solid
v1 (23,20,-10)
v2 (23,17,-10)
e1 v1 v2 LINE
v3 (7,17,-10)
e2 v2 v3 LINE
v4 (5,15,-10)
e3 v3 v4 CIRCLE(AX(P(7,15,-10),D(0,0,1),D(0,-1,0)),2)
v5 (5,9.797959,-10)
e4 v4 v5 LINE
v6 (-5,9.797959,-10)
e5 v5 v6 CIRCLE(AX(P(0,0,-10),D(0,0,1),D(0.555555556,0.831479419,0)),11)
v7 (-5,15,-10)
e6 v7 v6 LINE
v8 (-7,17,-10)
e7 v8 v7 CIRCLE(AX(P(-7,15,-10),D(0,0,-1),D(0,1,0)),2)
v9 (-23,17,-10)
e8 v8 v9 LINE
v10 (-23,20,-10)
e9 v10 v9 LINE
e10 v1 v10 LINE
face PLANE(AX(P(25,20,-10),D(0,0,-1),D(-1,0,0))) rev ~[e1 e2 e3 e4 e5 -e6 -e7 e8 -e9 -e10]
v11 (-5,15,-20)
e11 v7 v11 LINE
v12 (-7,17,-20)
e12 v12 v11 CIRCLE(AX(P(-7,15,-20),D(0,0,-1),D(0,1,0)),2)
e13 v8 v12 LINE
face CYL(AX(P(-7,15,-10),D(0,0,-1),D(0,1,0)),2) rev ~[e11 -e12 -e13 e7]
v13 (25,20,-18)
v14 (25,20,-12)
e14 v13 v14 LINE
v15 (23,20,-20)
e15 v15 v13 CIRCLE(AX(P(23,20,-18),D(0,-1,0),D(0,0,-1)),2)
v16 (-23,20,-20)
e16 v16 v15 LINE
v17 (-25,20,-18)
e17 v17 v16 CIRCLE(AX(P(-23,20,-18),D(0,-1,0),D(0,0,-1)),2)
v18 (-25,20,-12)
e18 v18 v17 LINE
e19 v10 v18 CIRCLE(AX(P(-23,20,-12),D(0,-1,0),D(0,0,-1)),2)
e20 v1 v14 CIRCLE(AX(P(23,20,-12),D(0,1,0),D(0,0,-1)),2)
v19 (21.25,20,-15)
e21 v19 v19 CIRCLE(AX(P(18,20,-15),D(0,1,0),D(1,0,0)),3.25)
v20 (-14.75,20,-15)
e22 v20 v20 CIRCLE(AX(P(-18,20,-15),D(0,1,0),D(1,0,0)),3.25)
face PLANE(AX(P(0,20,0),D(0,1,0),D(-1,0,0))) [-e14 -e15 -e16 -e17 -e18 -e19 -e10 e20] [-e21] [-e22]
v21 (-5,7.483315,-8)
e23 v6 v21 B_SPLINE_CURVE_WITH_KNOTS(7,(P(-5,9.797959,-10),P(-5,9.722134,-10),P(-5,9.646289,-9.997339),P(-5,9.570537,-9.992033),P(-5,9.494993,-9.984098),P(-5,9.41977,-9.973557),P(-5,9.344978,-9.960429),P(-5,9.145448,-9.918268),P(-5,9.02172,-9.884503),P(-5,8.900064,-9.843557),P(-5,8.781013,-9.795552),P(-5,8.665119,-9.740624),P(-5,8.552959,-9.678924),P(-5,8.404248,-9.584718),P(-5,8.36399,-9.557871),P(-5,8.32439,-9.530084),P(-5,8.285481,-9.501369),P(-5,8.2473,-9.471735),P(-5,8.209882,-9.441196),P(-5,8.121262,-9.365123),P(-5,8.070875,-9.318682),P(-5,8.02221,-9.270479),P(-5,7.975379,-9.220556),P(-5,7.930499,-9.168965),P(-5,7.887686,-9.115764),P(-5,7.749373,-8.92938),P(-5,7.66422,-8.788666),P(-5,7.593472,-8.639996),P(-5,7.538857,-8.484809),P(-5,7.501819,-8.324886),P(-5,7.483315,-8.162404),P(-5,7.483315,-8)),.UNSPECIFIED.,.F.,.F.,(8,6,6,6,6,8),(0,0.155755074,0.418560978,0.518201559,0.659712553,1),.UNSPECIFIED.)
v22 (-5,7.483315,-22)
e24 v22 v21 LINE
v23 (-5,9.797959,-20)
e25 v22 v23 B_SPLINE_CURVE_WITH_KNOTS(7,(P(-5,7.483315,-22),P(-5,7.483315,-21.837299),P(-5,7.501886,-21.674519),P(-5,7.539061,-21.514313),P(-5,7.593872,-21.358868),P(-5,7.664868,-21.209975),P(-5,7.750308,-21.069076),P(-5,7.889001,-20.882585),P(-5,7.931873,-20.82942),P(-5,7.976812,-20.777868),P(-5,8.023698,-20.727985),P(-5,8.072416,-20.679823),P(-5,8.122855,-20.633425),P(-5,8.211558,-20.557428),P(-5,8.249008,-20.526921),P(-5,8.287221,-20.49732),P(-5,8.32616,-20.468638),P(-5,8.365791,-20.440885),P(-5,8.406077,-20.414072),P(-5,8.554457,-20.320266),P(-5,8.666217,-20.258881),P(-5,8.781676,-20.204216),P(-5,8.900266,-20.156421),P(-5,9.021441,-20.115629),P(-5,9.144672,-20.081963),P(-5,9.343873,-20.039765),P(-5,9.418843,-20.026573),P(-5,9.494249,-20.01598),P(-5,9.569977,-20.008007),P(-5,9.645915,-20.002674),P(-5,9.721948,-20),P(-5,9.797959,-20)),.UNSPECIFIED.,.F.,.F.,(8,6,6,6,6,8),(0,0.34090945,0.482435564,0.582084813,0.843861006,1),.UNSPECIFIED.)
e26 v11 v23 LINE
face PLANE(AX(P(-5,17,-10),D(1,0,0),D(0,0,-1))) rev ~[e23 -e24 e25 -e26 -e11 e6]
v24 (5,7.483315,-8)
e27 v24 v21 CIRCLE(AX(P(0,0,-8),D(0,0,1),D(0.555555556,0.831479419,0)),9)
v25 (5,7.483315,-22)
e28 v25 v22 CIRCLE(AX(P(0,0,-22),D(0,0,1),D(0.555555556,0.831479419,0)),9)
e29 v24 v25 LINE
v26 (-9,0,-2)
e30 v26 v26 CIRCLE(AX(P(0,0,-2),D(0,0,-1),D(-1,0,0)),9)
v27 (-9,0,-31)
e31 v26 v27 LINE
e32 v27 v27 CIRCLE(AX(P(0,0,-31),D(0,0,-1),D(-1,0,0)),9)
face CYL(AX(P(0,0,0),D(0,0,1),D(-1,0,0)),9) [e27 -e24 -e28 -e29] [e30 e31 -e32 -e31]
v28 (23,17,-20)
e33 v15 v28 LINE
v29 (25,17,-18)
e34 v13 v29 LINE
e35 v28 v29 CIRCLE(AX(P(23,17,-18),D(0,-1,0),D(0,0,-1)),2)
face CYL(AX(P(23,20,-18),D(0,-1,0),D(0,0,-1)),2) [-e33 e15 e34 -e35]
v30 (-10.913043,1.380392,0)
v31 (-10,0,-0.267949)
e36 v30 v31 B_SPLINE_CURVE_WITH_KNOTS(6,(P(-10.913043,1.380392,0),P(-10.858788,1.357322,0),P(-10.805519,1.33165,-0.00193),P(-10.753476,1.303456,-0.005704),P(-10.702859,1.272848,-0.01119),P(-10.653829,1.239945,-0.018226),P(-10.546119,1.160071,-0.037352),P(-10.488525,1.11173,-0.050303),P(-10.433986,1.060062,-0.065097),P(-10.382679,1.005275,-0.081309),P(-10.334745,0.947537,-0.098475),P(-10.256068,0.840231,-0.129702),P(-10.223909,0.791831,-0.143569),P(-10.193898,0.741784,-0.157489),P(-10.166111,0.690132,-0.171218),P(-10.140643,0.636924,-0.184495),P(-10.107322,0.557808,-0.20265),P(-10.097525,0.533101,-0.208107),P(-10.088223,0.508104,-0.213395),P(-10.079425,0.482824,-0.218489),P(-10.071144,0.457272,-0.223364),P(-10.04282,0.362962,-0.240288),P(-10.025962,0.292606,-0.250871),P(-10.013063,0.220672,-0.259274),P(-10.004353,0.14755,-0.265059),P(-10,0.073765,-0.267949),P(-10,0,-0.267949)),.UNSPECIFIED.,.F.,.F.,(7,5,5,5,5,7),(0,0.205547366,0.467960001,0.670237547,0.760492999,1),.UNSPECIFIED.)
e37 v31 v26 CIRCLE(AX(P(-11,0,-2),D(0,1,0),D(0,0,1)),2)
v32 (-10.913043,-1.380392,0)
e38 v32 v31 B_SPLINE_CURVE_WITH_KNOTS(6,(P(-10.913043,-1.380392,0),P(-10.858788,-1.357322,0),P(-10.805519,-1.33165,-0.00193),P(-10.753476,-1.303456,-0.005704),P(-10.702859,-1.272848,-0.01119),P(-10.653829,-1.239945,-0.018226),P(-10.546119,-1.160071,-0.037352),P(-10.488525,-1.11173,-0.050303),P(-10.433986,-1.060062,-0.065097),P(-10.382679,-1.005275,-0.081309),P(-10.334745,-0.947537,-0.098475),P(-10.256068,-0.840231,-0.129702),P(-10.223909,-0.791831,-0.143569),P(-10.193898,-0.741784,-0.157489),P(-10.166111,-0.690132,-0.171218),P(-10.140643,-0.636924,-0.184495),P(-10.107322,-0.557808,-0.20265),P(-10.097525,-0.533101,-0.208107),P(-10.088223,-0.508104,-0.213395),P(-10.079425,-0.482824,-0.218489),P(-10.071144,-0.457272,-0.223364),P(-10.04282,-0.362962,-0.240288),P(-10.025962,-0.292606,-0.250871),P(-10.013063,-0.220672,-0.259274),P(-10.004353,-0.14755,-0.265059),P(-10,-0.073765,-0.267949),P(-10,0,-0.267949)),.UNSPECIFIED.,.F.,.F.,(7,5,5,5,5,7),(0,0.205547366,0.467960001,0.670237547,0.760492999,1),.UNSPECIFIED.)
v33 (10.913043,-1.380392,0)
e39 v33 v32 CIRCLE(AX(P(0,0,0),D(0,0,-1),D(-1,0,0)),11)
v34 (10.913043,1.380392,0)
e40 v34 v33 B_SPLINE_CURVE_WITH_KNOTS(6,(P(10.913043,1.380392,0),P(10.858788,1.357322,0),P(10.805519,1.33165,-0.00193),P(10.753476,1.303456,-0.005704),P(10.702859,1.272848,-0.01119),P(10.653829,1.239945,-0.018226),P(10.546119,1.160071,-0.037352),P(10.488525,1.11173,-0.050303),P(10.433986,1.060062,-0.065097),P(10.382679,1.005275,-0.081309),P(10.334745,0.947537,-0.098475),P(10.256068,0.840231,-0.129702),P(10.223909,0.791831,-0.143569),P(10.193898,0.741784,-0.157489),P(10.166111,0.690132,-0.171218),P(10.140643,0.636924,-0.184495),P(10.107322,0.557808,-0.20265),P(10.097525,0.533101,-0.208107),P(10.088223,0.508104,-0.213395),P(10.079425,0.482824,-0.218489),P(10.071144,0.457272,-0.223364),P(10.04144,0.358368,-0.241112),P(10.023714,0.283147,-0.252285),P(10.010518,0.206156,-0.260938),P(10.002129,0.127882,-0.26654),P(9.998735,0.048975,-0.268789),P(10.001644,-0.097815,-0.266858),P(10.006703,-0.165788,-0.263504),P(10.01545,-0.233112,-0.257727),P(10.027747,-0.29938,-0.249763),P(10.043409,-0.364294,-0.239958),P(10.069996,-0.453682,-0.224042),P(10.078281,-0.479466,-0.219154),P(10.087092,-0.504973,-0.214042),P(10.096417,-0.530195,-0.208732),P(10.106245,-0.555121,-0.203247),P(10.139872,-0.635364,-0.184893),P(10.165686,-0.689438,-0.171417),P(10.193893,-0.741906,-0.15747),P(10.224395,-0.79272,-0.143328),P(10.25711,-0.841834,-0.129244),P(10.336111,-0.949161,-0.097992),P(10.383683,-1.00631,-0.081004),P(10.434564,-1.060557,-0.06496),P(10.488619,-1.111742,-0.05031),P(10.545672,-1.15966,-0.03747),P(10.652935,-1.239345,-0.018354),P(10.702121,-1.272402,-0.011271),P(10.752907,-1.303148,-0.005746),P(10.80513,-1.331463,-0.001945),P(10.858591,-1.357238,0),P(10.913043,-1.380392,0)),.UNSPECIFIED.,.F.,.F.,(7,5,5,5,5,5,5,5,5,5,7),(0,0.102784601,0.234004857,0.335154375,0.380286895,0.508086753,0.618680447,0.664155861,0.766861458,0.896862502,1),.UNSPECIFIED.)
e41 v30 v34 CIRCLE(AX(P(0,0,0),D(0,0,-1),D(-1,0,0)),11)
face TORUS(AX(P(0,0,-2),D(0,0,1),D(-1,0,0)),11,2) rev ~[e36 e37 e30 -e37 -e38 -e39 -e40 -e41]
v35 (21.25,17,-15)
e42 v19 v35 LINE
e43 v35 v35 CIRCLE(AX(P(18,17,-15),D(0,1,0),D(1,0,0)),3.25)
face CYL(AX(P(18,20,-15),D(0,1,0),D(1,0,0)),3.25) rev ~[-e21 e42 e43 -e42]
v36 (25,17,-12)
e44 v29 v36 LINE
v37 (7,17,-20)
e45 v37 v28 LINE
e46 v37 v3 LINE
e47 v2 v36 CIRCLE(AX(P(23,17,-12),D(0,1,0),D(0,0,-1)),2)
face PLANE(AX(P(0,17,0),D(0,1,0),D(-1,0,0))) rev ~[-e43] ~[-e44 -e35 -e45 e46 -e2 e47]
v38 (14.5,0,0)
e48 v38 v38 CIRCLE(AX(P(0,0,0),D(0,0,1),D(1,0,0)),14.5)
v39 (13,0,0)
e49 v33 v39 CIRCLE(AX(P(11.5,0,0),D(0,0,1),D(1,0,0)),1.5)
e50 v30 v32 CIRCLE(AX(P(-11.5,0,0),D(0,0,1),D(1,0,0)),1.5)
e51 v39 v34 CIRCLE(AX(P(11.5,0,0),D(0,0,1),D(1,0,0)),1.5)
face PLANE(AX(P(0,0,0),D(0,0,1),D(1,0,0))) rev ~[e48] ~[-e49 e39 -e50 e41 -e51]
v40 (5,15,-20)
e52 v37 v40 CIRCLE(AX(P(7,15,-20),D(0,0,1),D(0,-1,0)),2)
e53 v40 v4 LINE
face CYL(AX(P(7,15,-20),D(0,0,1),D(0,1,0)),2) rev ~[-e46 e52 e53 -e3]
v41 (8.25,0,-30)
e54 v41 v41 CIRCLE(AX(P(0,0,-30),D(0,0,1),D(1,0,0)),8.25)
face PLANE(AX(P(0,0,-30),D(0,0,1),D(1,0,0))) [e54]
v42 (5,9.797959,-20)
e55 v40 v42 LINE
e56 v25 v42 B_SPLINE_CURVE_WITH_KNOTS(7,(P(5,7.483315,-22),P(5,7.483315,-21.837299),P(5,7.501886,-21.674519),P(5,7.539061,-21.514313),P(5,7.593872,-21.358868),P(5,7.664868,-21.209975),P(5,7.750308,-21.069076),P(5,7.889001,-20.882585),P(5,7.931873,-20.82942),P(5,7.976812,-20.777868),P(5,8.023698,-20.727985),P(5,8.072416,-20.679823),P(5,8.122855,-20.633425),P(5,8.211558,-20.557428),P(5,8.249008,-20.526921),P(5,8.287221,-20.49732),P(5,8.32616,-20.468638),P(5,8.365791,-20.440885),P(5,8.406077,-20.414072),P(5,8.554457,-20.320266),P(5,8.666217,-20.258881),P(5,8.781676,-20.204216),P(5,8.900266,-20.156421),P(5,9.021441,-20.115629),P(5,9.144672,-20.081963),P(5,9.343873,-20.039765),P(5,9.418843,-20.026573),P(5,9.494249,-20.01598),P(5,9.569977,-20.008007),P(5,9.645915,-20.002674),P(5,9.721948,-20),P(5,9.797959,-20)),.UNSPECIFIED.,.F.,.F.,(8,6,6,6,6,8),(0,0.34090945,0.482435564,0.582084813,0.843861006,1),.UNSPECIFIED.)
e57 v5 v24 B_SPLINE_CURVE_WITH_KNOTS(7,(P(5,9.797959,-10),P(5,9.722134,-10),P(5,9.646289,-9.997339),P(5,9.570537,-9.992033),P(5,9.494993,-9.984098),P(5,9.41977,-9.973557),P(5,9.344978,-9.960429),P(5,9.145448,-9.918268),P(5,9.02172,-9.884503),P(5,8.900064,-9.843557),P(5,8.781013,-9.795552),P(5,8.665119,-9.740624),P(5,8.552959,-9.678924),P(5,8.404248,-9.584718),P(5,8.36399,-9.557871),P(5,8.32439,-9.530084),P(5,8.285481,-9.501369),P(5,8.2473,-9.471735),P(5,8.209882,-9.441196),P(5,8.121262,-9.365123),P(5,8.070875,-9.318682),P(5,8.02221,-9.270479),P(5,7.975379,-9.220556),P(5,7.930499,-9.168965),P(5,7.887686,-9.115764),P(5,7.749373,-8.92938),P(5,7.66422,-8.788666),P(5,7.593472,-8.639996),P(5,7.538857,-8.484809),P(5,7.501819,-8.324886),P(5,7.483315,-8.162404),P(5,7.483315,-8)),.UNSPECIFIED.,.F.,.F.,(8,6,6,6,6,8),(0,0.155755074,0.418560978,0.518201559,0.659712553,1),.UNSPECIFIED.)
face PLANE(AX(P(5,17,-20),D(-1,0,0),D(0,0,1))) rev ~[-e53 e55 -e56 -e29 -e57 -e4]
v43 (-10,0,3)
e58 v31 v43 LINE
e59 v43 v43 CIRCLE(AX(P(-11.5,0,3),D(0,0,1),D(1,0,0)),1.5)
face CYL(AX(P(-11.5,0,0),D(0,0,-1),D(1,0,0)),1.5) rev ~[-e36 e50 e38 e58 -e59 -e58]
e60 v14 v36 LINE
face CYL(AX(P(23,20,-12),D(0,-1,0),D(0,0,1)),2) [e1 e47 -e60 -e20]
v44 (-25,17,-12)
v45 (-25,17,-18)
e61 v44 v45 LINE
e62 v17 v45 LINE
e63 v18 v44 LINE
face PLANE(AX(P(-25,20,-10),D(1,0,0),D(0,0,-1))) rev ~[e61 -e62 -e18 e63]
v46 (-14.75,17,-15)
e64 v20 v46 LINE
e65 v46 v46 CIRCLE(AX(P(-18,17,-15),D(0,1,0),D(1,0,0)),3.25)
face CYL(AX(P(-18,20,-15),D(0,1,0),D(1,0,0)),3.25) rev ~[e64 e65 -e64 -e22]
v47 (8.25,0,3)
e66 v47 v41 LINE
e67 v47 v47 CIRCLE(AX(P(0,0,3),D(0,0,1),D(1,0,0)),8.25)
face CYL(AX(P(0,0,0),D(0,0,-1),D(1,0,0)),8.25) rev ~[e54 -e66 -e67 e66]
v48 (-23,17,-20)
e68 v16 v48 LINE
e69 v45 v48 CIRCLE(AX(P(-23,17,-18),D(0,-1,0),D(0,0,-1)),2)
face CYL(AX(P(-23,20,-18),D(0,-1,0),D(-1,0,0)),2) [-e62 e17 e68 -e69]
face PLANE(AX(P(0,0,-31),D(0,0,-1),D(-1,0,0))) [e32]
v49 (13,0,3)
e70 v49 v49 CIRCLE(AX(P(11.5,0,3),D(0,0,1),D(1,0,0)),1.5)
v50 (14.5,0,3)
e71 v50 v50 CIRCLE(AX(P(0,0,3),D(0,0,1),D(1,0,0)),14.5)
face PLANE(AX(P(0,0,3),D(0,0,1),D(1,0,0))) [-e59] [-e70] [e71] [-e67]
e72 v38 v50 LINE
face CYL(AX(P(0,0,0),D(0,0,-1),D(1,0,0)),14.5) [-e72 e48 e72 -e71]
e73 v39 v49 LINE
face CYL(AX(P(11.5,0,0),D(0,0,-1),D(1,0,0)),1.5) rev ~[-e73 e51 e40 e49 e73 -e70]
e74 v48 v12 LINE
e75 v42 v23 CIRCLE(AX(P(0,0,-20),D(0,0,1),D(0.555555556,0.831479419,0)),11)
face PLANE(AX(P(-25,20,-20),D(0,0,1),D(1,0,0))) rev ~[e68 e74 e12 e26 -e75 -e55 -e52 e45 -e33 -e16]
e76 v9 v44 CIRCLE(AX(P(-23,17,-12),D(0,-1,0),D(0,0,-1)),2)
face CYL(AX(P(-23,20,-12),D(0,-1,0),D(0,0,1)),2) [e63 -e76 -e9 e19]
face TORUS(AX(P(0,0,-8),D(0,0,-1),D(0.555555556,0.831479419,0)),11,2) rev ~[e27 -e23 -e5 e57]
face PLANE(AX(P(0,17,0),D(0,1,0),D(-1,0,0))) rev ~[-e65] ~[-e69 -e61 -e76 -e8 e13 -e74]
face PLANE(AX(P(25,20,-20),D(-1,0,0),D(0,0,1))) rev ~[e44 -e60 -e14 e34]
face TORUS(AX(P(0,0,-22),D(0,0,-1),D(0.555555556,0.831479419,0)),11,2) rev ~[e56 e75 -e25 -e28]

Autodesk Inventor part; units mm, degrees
ref_plane "YZ Plane" through (0, 0, 0) normal (1, 0, 0) x (0, 1, 0)
ref_plane "XY Plane" through (0, 0, 0) normal (0, 0, 1) x (1, 0, 0)
sketch "Sketch1" plane through (0, 0, 0) normal (0, 0, 1) x (1, 0, 0)
  circle A0 centre (0, 0) radius 14.5
  circle A1 centre (11.5, 0) radius 1.5
  line L0 (0, 16.0858) -> (0, -16.9174) construction
  line L1 (-27.4443, 0) -> (33.7473, 0) construction
  circle A2 centre (-11.5, 0) radius 1.5
  circle A3 centre (0, 0) radius 8.25
  dimension "d0" = 29
  dimension "d1" = 3
  dimension "d2" = 11.5
  dimension "d3" = 16.5
extrude "Extrusion1" add sketch "Sketch1" along normal blind 3
sketch "Sketch2" plane through (0, 0, 0) normal (0, 0, -1) x (-1, 0, 0)
  circle A0 centre (0, 0) radius 9
  dimension "d6" = 18
extrude "Extrusion2" add sketch "Sketch2" along normal blind 31
fillet "Fillet1" radius 2 1 edges at (9, 0, 0)
sketch "Sketch3" plane through (0, 0, 0) normal (0, 0, 1) x (1, 0, 0)
  circle A0 centre (0, 0) radius 8.25 projected
extrude "Extrusion3" cut sketch "Sketch3" against normal blind 30
ref_plane "Work Plane1" through (0, 20, 0) normal (0, 1, 0) x (-1, 0, 0)
sketch "Sketch5" plane through (0, 20, 0) normal (0, 1, 0) x (-1, 0, 0)
  line L0 (-25, -10) -> (25, -10)
  line L1 (25, -10) -> (25, -20)
  line L2 (25, -20) -> (-25, -20)
  line L3 (-25, -20) -> (-25, -10)
  line L4 (-25, -10) -> (25, -20) construction
  line L5 (25, -10) -> (-25, -20) construction
  point P0 (0, 0)
  point P1 (0, -15)
  dimension "d19" = 50
  dimension "d20" = 10
  dimension "d27" = 15
extrude "Extrusion5" add sketch "Sketch5" against normal blind 3
fillet "Fillet3" radius 2 4 edges at (-25, 18.5, -10) (-25, 18.5, -20) (25, 18.5, -10) (25, 18.5, -20)
sketch "Sketch6" plane through (0, 17, 0) normal (0, -1, 0) x (1, 0, 0)
  line L0 (-5, -20) -> (5, -20)
  line L1 (5, -20) -> (5, -10)
  line L2 (5, -10) -> (-5, -10)
  line L3 (-5, -10) -> (-5, -20)
  line L4 (-5, -20) -> (5, -10) construction
  line L5 (5, -20) -> (-5, -10) construction
  point P0 (0, 0)
  point P1 (0, -15)
  dimension "d24" = 10
  dimension "d25" = 10
  dimension "d26" = 15
extrude "Extrusion6" add sketch "Sketch6" along normal up to next
fillet "Fillet4" radius 2 2 edges at (5, 17, -15) (-5, 17, -15)
fillet "Fillet5" radius 2 2 edges at (0, 9, -10) (0, 9, -20)
sketch "Sketch7" plane through (0, 20, 0) normal (0, 1, 0) x (1, 0, 0)
  circle A0 centre (18, 15) radius 3.25
  circle A1 centre (-18, 15) radius 3.25
  line L0 (0, -10.182) -> (0, 25.8871) construction
  line L1 (-23, 10) -> (23, 10) projected
  point P0 (0, 0)
  dimension "d32" = 6.5
  dimension "d33" = 6.5
  dimension "d34" = 36
  dimension "d35" = 5
extrude "Extrusion7" cut sketch "Sketch7" against normal blind 10
properties part number "AcopleTC"
